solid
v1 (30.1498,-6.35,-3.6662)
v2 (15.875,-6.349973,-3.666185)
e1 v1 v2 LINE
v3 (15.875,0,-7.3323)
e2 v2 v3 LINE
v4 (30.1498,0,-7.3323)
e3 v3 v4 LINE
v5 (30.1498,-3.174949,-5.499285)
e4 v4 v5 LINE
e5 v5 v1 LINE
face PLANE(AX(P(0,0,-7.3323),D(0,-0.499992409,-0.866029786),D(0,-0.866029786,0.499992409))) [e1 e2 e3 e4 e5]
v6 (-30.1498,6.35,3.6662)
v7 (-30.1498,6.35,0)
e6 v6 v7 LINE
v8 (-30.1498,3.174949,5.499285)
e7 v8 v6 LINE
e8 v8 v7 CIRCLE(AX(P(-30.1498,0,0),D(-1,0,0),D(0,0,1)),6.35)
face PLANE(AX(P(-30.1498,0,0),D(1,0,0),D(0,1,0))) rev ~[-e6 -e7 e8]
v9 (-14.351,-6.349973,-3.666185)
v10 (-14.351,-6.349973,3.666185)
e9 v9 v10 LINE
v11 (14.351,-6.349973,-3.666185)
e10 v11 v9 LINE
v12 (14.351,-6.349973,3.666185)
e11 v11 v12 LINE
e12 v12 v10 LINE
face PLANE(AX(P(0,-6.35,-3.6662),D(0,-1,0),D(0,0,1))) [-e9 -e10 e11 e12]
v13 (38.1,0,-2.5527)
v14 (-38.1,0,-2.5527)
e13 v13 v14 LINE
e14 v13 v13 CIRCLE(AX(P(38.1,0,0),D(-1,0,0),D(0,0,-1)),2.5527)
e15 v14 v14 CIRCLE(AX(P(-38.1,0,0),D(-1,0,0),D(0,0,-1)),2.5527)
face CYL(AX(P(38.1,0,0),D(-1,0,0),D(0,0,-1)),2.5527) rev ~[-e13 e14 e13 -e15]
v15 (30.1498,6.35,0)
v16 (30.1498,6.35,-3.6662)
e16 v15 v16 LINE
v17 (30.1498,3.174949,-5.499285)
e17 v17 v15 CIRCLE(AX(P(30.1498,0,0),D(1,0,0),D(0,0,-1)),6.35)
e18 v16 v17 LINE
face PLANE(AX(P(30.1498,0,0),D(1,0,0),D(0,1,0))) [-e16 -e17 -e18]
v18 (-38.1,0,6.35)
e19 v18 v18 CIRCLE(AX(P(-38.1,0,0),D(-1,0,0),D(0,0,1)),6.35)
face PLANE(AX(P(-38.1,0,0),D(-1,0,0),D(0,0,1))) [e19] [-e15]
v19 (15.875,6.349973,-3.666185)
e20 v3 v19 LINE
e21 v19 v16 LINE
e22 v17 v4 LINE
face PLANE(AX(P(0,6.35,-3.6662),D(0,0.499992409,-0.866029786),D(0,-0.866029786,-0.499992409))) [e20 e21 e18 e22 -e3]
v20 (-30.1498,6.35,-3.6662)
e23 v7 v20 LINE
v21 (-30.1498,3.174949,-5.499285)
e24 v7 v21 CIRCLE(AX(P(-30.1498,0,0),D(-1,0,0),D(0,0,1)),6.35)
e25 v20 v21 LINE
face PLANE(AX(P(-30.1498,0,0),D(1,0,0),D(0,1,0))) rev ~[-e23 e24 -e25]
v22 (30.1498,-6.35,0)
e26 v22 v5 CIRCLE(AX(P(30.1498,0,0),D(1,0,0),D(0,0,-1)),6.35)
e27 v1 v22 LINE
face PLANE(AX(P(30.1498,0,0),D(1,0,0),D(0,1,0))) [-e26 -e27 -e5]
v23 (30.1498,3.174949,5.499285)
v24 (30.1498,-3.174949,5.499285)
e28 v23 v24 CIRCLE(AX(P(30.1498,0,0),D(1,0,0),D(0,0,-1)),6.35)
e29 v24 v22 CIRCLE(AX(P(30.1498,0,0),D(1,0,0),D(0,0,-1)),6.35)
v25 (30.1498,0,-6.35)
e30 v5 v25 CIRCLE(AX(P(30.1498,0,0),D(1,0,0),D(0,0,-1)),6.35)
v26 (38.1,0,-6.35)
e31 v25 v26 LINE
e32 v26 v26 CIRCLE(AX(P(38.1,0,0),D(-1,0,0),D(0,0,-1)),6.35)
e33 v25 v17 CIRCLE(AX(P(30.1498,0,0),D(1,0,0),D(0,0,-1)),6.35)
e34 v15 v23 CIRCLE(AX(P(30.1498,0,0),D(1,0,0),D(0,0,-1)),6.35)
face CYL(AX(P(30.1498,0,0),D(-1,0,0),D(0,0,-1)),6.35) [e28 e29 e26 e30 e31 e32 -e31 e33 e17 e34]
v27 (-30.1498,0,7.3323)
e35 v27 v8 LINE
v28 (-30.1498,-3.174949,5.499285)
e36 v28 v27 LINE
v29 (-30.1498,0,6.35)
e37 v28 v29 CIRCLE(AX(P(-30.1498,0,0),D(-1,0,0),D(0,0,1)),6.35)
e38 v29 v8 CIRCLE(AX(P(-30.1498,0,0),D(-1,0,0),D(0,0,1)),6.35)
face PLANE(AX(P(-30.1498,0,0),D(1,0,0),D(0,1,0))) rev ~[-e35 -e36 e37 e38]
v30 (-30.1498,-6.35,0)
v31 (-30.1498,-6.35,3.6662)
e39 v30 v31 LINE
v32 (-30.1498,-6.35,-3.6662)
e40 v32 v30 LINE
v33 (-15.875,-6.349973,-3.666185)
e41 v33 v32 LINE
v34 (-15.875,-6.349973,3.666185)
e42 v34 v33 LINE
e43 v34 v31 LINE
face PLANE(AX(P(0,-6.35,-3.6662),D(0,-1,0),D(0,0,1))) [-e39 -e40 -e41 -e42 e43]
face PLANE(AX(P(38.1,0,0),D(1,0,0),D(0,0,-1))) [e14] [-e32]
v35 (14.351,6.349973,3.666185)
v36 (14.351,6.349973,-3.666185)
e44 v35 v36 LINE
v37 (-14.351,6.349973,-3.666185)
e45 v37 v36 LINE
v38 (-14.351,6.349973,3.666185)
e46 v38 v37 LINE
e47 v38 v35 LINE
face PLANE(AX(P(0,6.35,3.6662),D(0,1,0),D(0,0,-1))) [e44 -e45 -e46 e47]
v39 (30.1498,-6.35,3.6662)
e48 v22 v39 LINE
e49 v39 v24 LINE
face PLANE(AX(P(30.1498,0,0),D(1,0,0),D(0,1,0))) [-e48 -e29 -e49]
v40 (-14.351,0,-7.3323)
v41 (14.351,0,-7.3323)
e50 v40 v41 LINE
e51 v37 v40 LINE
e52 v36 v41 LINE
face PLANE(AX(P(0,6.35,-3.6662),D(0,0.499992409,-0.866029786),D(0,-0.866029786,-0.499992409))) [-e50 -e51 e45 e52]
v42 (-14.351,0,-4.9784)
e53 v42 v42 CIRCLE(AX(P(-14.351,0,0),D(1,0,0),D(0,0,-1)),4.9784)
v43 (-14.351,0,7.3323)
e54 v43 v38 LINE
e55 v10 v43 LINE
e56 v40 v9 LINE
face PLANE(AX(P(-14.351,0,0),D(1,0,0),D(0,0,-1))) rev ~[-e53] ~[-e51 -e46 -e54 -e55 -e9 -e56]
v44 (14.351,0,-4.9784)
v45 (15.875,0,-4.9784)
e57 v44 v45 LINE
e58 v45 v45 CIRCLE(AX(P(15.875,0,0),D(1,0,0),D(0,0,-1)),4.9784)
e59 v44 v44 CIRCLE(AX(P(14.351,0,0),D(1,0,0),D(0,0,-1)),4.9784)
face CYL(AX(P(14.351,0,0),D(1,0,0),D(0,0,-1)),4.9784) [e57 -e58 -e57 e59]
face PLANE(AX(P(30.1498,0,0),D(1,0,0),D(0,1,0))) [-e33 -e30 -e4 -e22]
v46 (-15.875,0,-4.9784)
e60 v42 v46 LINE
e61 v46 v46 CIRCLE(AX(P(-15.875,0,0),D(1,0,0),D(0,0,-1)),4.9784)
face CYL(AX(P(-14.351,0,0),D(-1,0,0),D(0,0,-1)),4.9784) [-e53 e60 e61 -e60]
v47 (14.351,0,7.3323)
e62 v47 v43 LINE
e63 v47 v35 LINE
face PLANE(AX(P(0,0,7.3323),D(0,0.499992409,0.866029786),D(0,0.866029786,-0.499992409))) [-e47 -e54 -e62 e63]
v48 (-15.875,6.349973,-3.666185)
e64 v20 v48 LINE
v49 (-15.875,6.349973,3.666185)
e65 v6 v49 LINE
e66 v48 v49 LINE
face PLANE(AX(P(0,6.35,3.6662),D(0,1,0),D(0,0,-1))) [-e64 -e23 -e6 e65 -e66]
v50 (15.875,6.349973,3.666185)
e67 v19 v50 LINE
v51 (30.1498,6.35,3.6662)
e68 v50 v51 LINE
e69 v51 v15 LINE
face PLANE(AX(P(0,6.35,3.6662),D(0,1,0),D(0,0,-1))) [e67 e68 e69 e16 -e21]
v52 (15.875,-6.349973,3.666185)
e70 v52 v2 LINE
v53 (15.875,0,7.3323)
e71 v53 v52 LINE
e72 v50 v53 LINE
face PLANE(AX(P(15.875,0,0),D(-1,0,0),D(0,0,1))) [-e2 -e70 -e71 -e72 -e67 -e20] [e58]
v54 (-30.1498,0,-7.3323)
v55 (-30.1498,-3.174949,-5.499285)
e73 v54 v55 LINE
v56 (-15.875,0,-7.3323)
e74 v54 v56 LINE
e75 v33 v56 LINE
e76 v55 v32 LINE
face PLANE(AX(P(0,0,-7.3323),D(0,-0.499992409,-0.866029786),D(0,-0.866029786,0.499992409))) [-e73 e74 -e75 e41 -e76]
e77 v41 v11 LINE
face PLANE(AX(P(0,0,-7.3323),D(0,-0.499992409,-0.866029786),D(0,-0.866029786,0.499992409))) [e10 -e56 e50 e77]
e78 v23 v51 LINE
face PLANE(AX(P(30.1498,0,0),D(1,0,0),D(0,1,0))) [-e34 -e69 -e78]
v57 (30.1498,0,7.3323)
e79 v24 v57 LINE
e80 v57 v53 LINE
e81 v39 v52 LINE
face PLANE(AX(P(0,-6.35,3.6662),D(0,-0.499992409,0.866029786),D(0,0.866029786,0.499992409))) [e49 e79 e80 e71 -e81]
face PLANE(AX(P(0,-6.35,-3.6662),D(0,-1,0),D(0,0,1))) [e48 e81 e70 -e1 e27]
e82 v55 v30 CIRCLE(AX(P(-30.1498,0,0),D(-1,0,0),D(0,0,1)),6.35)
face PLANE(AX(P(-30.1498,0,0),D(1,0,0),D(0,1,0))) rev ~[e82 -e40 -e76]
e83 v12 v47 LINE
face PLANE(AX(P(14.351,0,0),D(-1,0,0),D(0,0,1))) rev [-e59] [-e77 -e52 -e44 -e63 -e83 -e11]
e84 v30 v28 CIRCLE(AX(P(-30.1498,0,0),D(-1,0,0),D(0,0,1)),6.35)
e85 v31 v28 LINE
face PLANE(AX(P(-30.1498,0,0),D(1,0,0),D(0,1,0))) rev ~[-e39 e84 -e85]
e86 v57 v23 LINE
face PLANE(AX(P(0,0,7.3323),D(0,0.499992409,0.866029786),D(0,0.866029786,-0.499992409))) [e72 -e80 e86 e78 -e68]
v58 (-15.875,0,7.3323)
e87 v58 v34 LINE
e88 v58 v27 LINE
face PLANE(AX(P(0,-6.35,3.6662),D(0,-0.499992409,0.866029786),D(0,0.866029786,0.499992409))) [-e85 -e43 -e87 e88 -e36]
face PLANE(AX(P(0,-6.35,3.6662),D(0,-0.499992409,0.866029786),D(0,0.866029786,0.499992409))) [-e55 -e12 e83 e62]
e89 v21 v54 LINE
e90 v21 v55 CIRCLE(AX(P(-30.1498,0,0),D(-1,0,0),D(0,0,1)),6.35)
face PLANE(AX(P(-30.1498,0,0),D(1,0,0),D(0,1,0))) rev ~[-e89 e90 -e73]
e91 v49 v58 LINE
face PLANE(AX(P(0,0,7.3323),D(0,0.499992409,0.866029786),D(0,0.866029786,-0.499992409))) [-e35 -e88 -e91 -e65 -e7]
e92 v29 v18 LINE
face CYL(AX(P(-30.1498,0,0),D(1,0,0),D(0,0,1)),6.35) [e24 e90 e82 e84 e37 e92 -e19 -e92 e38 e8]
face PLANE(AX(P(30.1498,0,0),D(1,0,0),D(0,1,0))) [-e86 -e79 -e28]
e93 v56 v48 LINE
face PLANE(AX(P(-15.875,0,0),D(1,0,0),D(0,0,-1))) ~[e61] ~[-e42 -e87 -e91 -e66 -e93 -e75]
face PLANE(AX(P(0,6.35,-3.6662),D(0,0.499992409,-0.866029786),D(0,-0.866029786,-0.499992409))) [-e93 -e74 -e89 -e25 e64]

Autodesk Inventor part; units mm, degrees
ref_plane "YZ Plane" through (0, 0, 0) normal (1, 0, 0) x (0, 1, 0)
ref_plane "XZ Plane" through (0, 0, 0) normal (0, 1, 0) x (-1, 0, 0)
ref_plane "XY Plane" through (0, 0, 0) normal (0, 0, 1) x (1, 0, 0)
sketch "Sketch1" plane through (0, 0, 0) normal (1, 0, 0) x (0, 1, 0)
  line L0 (0, -7.3323) -> (-6.35, -3.6662)
  line L1 (-6.35, -3.6662) -> (-6.35, 3.6662)
  line L2 (-6.35, 3.6662) -> (0, 7.3323)
  line L3 (0, 7.3323) -> (6.35, 3.6662)
  line L4 (6.35, 3.6662) -> (6.35, -3.6662)
  line L5 (6.35, -3.6662) -> (0, -7.3323)
  point P0 (0, 0)
  point P1 (0, 0)
  dimension "d0" = 12.7
extrude "Extrusion1" add sketch "Sketch1" along normal mid plane 60.2996
sketch "Sketch2" plane through (-30.1498, 0, 0) normal (-1, 0, 0) x (0, 0, 1)
  circle A0 centre (0, 0) radius 6.35
  dimension "d3" = 12.7
extrude "Extrusion2" add sketch "Sketch2" along normal blind 7.9502
sketch "Sketch3" plane through (30.1498, 0, 0) normal (1, 0, 0) x (0, 0, -1)
  circle A0 centre (0, 0) radius 6.35
  line L0 (3.6662, 6.35) -> (-3.6662, 6.35) projected
  line L1 (-3.6662, 6.35) -> (-7.3323, 0) projected
  line L2 (-7.3323, 0) -> (-3.6662, -6.35) projected
  line L3 (-3.6662, -6.35) -> (3.6662, -6.35) projected
  line L4 (3.6662, -6.35) -> (7.3323, 0) projected
  line L5 (7.3323, 0) -> (3.6662, 6.35) projected
  dimension "d6" = 12.7
extrude "Extrusion3" add sketch "Sketch3" along normal blind 7.9502 contours A0
sketch "Sketch4" plane through (38.1, 0, 0) normal (1, 0, 0) x (0, 0, -1)
  point P0 (0, 0)
  point P1 (0, 0)
hole "Hole1" at (38.1, 0, 0) direction (-1, 0, 0) diameter 5.1054 end through all clearance for "Flat Head Machine Screw (82)" size "#10" standard "Ansi Unified Screw Threads"
sketch "Sketch6" plane through (0, 0, 0) normal (0, 1, 0) x (-1, 0, 0)
  line L0 (30.1498, 6.35) -> (38.1, 6.35) projected
  line L1 (38.1, 6.35) -> (38.1, 2.5527) projected
  line L2 (38.1, 2.5527) -> (-38.1, 2.5527) projected
  line L3 (-38.1, 2.5527) -> (-38.1, 6.35) projected
  line L4 (-38.1, 6.35) -> (-30.1498, 6.35) projected
  line L5 (-30.1498, 6.35) -> (-30.1498, 7.3323) projected
  line L6 (-30.1498, 7.3323) -> (30.1498, 7.3323) projected
  line L7 (30.1498, 7.3323) -> (30.1498, 6.35) projected
  line L8 (38.1, -6.35) -> (30.1498, -6.35) projected
  line L9 (30.1498, -6.35) -> (30.1498, -7.3323) projected
  line L10 (30.1498, -7.3323) -> (-30.1498, -7.3323) projected
  line L11 (-30.1498, -7.3323) -> (-30.1498, -6.35) projected
  line L12 (-30.1498, -6.35) -> (-38.1, -6.35) projected
  line L13 (-38.1, -6.35) -> (-38.1, -2.5527) projected
  line L14 (-38.1, -2.5527) -> (38.1, -2.5527) projected
  line L15 (38.1, -2.5527) -> (38.1, -6.35) projected
  line L16 (38.1, 2.5527) -> (38.1, -2.5527) projected
  line L17 (38.1, 0) -> (-38.1, 0)
  line L18 (-38.1, 6.35) -> (-38.1, -6.35) projected
  line L19 (15.875, -7.3323) -> (14.351, -7.3323)
  line L20 (14.351, -7.3323) -> (14.351, -4.9784)
  line L21 (14.351, -4.9784) -> (15.875, -4.9784)
  line L22 (15.875, -4.9784) -> (15.875, -7.3323)
  point P0 (0, 0)
  dimension "d16" = 9.9568
  dimension "d17" = 1.524
  dimension "d18" = 22.225
revolve "Revolution1" cut sketch "Sketch6" angle 360 about axis through (-38.1, 0, 0) along (1, 0, 0) contours L10 L20 L21 L22
mirror "Mirror1" about plane through (0, 0, 0) normal (1, 0, 0) of "Revolution1"
properties part number "EL2-GB-005E-grove" material "Aluminum 6061"
